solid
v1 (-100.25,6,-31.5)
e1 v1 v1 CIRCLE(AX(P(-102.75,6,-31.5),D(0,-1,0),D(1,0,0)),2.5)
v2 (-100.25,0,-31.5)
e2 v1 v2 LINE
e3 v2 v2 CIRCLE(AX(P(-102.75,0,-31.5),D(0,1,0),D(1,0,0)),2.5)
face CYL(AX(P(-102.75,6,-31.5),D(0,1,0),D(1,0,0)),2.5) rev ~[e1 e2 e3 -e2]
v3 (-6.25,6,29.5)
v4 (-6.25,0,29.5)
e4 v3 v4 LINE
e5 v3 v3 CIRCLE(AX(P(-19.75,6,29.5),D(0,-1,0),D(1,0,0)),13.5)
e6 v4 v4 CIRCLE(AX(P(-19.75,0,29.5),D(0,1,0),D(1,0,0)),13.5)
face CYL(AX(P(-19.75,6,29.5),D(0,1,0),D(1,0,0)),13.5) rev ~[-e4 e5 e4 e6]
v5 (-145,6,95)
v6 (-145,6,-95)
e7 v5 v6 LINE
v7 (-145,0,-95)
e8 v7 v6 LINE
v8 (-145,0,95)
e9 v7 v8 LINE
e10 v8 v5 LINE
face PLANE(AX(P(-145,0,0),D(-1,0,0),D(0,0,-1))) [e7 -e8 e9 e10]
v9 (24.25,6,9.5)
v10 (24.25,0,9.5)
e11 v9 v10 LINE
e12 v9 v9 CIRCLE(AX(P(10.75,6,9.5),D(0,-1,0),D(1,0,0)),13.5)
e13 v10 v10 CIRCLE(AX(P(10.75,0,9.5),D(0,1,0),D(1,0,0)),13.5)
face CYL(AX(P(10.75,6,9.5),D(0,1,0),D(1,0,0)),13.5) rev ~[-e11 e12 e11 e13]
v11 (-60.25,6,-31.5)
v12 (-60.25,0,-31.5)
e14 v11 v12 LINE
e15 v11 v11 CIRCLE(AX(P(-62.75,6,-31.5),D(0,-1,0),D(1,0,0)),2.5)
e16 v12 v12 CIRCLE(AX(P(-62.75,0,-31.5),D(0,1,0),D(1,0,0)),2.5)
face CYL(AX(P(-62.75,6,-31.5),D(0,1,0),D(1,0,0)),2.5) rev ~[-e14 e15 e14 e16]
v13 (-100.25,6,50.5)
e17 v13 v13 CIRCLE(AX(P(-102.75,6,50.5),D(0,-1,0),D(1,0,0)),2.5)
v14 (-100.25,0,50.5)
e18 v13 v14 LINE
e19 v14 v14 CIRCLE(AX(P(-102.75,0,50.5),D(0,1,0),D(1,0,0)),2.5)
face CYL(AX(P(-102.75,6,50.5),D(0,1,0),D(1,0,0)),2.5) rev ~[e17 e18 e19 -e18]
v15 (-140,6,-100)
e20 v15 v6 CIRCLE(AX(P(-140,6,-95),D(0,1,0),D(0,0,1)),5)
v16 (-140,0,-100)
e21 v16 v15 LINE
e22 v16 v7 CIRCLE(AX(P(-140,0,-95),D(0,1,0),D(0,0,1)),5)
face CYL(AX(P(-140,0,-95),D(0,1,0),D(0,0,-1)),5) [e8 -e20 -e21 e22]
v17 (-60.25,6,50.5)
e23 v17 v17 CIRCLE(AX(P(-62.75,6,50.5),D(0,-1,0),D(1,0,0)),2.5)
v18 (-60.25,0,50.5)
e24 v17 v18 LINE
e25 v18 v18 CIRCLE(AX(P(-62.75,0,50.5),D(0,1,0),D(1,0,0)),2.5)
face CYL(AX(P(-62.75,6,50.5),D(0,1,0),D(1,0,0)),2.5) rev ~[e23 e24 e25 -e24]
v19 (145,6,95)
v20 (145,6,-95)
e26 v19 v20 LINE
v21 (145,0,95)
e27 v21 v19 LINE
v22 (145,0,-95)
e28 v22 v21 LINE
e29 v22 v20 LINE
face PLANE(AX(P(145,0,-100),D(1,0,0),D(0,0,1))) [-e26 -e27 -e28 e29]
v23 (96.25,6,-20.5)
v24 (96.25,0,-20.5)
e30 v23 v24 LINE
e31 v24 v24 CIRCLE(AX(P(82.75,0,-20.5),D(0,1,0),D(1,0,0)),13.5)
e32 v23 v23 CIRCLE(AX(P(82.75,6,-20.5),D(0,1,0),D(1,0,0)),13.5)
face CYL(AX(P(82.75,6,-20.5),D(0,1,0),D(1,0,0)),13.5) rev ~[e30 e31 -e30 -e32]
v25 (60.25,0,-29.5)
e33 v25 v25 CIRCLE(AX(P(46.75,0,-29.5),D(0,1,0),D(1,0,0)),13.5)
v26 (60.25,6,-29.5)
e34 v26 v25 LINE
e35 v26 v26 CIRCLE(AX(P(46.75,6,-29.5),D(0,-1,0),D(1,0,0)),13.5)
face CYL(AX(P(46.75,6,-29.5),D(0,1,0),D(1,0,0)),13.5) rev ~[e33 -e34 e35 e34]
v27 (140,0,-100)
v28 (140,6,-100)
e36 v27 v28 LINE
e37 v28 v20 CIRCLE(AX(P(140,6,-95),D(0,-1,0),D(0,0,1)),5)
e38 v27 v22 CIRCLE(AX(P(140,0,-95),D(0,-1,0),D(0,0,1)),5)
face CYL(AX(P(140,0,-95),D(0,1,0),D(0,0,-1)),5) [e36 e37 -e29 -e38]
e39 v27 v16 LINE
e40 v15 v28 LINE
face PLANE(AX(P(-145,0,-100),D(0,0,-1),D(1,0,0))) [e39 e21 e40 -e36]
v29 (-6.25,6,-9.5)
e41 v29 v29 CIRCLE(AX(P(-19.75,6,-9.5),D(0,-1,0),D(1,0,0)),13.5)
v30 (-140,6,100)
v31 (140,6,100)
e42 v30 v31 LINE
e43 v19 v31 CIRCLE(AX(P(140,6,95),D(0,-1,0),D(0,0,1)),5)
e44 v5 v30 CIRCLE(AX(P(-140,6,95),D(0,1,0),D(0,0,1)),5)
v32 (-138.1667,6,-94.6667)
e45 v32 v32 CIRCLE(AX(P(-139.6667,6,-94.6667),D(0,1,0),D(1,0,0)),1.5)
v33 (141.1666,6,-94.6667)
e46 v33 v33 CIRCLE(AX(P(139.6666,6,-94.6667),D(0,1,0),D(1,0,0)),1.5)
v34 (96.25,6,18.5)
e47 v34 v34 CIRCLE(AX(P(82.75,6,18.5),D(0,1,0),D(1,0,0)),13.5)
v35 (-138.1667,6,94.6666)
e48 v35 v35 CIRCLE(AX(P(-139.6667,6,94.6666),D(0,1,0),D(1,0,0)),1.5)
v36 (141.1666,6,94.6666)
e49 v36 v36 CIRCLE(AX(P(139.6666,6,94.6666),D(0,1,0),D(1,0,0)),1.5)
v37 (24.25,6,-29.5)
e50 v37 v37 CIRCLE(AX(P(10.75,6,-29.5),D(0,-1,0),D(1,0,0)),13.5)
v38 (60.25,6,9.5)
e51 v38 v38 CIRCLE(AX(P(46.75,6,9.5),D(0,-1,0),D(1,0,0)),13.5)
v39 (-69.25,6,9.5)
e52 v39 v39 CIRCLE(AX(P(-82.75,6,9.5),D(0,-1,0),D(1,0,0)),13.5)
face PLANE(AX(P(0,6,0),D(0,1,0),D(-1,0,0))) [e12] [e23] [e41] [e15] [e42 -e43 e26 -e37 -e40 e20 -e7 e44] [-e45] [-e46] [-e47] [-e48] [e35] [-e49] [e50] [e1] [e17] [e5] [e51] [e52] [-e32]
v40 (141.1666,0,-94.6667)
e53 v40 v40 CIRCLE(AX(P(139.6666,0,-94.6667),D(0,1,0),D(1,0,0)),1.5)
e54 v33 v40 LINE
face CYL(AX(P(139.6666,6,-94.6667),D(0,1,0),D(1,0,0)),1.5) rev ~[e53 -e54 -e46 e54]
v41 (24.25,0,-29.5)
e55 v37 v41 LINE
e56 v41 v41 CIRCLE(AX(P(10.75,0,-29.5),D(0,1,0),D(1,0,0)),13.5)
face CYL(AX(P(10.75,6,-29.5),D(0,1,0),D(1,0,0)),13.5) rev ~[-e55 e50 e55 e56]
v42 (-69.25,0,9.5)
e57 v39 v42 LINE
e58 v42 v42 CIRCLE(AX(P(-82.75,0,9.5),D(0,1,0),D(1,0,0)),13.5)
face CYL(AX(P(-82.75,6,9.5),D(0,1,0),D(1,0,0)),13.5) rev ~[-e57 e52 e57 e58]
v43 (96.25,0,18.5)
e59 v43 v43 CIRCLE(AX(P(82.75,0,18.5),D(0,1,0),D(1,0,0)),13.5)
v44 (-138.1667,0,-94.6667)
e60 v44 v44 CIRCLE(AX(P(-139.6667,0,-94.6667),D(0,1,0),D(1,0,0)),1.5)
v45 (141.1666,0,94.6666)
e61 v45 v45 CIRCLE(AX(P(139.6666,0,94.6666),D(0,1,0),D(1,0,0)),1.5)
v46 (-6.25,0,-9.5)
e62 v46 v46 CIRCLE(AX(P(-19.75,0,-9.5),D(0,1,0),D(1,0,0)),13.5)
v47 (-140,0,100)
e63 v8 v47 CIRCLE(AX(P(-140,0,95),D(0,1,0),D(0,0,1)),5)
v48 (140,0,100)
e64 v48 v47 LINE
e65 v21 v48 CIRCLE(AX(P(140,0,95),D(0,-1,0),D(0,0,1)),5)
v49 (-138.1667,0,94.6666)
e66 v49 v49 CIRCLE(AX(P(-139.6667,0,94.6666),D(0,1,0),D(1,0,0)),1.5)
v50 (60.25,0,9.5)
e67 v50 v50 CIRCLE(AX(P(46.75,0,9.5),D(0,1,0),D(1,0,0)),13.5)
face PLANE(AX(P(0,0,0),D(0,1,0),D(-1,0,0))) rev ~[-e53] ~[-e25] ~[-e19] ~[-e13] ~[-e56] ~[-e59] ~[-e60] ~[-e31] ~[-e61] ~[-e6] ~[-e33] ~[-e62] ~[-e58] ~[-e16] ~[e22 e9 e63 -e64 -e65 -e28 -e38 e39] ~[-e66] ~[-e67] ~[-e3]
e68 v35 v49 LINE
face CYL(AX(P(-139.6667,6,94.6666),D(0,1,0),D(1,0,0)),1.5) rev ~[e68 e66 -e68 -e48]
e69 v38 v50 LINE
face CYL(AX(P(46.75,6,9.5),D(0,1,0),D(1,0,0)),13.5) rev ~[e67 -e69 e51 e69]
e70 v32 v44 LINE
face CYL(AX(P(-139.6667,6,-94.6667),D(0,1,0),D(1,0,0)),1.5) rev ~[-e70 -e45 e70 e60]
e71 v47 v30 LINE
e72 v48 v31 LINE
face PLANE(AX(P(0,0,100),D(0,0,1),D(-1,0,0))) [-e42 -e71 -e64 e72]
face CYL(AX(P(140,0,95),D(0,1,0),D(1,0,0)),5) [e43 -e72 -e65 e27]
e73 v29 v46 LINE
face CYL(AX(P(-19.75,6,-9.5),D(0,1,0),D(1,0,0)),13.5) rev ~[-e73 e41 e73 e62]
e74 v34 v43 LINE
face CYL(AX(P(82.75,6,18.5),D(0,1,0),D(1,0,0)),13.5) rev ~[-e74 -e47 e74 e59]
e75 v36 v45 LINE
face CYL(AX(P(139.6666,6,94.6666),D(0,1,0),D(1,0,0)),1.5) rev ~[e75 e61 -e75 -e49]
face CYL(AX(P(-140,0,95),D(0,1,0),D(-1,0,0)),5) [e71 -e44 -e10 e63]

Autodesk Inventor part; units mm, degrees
ref_plane "YZ Plane" through (0, 0, 0) normal (1, 0, 0) x (0, 1, 0)
ref_plane "XZ Plane" through (0, 0, 0) normal (0, 1, 0) x (-1, 0, 0)
ref_plane "XY Plane" through (0, 0, 0) normal (0, 0, 1) x (1, 0, 0)
sketch "Sketch1" plane through (0, 0, 0) normal (0, 1, 0) x (-1, 0, 0)
  line L0 (145, -100) -> (-145, -100)
  line L1 (-145, -100) -> (-145, 100)
  line L2 (-145, 100) -> (145, 100)
  line L3 (145, 100) -> (145, -100)
  line L4 (210, 0) -> (-210, 0) projected
  line L5 (0, -140) -> (0, 140) projected
  point P0 (0, 0)
  dimension "d30" = 290
  dimension "d31" = 200
extrude "Extrusion1" add sketch "Sketch1" along normal blind 6
sketch "Sketch2" plane through (0, 6, 0) normal (0, 1, 0) x (1, 0, 0)
  circle A0 centre (-19.75, -29.5) radius 13.5
  circle A1 centre (-82.75, -9.5) radius 13.5
  circle A2 centre (-19.75, 9.5) radius 13.5
  circle A3 centre (46.75, 29.5) radius 13.5
  circle A4 centre (82.75, 20.5) radius 13.5
  circle A5 centre (10.75, 29.5) radius 13.5
  circle A6 centre (10.75, -9.5) radius 13.5
  circle A7 centre (46.75, -9.5) radius 13.5
  circle A8 centre (82.75, -18.5) radius 13.5
  line L0 (-96.25, 43) -> (96.25, 43)
  line L1 (96.25, 43) -> (96.25, -43)
  line L2 (96.25, -43) -> (-96.25, -43)
  line L3 (-96.25, -43) -> (-96.25, 43)
  line L4 (145, 100) -> (-145, 100) projected
  line L5 (145, -100) -> (145, 100) projected
  line L6 (0, 140) -> (0, -140) projected
  line L7 (-210, 0) -> (210, 0) projected
  line L8 (-102.75, 31.5) -> (-62.75, 31.5)
  line L9 (-62.75, 31.5) -> (-62.75, -50.5)
  line L10 (-62.75, -50.5) -> (-102.75, -50.5)
  line L11 (-102.75, -50.5) -> (-102.75, 31.5)
  circle A9 centre (-102.75, 31.5) radius 2.5
  circle A10 centre (-62.75, 31.5) radius 2.5
  circle A11 centre (-102.75, -50.5) radius 2.5
  circle A12 centre (-62.75, -50.5) radius 2.5
  dimension "d3" = 27
  dimension "d19" = 30.5
  dimension "d20" = 36
  dimension "d23" = 19
  dimension "d24" = 9
  dimension "d25" = 36
  dimension "d26" = 11
  dimension "d27" = 9
  dimension "d28" = 11
  dimension "d29" = 63
  dimension "d35" = 41
  dimension "d36" = 41
  dimension "d37" = 20
  dimension "d38" = 20
  dimension "d39" = 5
  dimension "d40" = 5
  dimension "d41" = 5
  dimension "d42" = 5
extrude "Extrusion2" cut sketch "Sketch2" against normal blind 30 contours A0 | A8 | L6 A6 L7 | A6 L6 | A12 L10 L9 | L9 L10 A12 | A1 L7 | L7 A1 | L7 A2 | A2 L7 | A10 L8 L9 | L9 L8 A10 | A4 | A3 | A6 L7 | A11 L11 L10 | L10 L11 A11 | L7 A7 | A7 L7 | L6 A5 | A5 L6 | A9 L11 L8 | L8 L11 A9 picked at (6.7806, -6.3333)
fillet "Fillet1" radius 5 4 edges at (-145, 3, 100) (145, 3, 100) (145, 3, -100) (-145, 3, -100)
sketch "Sketch3" plane through (0, 6, 0) normal (0, 1, 0) x (1, 0, 0)
  circle A0 centre (-139.6667, 94.6667) radius 1.5
  line L0 (140, 100) -> (-140, 100) projected
  line L1 (-145, 95) -> (-145, -95) projected
  point P0 (0, 0)
  dimension "d43" = 5.3333
  dimension "d44" = 5.3333
  dimension "d53" = 3
extrude "Extrusion3" cut sketch "Sketch3" against normal blind 20
pattern_linear "Rectangular Pattern1" count 2 spacing 279.3333 along (1, 0, 0) count 2 spacing 189.3333 along (0, 0, 1) of "Extrusion3"
equation "\"d30\" = BoxLength"
equation "\"d31\" = BoxWidth"
equation "\"d3\" = JS_Hole_dia"
equation "\"d36\" = 0.5 * JS_SH_L"
equation "\"d37\" = 0.5 * JS_SH_W"
equation "\"d38\" = 0.5 * JS_SH_W"
equation "\"d39\" = JS_SH_dia"
equation "\"d40\" = JS_SH_dia"
equation "\"d41\" = JS_SH_dia"
equation "\"d42\" = JS_SH_dia"
equation "\"d34\" = CornerOffset"
equation "\"d43\" = 0.666667 * CornerOffset + 0.333333 * SheetThickness"
equation "\"d44\" = 0.666667 * CornerOffset + 0.333333 * SheetThickness"
equation "\"d49\" = BoxLength - 1.33333 * CornerOffset - 0.666667 * SheetThickness"
equation "\"d52\" = BoxWidth - 1.33333 * CornerOffset - 0.666667 * SheetThickness"
equation "\"BoxLength\" = 290"
equation "\"BoxWidth\" = 200"
equation "\"JS_SH_L\" = 82"
equation "\"JS_SH_dia\" = 5"
equation "\"SheetThickness\" = 6"
equation "\"CornerOffset\" = 5"
equation "\"NutS\" = 5.7"
equation "\"NutThreadD2\" = 4.17"
equation "\"SideNutWidth\" = 2.5"
equation "\"JS_Hole_dia\" = 27"
equation "\"JS_SH_W\" = 40"
properties part number "sega_straight"
